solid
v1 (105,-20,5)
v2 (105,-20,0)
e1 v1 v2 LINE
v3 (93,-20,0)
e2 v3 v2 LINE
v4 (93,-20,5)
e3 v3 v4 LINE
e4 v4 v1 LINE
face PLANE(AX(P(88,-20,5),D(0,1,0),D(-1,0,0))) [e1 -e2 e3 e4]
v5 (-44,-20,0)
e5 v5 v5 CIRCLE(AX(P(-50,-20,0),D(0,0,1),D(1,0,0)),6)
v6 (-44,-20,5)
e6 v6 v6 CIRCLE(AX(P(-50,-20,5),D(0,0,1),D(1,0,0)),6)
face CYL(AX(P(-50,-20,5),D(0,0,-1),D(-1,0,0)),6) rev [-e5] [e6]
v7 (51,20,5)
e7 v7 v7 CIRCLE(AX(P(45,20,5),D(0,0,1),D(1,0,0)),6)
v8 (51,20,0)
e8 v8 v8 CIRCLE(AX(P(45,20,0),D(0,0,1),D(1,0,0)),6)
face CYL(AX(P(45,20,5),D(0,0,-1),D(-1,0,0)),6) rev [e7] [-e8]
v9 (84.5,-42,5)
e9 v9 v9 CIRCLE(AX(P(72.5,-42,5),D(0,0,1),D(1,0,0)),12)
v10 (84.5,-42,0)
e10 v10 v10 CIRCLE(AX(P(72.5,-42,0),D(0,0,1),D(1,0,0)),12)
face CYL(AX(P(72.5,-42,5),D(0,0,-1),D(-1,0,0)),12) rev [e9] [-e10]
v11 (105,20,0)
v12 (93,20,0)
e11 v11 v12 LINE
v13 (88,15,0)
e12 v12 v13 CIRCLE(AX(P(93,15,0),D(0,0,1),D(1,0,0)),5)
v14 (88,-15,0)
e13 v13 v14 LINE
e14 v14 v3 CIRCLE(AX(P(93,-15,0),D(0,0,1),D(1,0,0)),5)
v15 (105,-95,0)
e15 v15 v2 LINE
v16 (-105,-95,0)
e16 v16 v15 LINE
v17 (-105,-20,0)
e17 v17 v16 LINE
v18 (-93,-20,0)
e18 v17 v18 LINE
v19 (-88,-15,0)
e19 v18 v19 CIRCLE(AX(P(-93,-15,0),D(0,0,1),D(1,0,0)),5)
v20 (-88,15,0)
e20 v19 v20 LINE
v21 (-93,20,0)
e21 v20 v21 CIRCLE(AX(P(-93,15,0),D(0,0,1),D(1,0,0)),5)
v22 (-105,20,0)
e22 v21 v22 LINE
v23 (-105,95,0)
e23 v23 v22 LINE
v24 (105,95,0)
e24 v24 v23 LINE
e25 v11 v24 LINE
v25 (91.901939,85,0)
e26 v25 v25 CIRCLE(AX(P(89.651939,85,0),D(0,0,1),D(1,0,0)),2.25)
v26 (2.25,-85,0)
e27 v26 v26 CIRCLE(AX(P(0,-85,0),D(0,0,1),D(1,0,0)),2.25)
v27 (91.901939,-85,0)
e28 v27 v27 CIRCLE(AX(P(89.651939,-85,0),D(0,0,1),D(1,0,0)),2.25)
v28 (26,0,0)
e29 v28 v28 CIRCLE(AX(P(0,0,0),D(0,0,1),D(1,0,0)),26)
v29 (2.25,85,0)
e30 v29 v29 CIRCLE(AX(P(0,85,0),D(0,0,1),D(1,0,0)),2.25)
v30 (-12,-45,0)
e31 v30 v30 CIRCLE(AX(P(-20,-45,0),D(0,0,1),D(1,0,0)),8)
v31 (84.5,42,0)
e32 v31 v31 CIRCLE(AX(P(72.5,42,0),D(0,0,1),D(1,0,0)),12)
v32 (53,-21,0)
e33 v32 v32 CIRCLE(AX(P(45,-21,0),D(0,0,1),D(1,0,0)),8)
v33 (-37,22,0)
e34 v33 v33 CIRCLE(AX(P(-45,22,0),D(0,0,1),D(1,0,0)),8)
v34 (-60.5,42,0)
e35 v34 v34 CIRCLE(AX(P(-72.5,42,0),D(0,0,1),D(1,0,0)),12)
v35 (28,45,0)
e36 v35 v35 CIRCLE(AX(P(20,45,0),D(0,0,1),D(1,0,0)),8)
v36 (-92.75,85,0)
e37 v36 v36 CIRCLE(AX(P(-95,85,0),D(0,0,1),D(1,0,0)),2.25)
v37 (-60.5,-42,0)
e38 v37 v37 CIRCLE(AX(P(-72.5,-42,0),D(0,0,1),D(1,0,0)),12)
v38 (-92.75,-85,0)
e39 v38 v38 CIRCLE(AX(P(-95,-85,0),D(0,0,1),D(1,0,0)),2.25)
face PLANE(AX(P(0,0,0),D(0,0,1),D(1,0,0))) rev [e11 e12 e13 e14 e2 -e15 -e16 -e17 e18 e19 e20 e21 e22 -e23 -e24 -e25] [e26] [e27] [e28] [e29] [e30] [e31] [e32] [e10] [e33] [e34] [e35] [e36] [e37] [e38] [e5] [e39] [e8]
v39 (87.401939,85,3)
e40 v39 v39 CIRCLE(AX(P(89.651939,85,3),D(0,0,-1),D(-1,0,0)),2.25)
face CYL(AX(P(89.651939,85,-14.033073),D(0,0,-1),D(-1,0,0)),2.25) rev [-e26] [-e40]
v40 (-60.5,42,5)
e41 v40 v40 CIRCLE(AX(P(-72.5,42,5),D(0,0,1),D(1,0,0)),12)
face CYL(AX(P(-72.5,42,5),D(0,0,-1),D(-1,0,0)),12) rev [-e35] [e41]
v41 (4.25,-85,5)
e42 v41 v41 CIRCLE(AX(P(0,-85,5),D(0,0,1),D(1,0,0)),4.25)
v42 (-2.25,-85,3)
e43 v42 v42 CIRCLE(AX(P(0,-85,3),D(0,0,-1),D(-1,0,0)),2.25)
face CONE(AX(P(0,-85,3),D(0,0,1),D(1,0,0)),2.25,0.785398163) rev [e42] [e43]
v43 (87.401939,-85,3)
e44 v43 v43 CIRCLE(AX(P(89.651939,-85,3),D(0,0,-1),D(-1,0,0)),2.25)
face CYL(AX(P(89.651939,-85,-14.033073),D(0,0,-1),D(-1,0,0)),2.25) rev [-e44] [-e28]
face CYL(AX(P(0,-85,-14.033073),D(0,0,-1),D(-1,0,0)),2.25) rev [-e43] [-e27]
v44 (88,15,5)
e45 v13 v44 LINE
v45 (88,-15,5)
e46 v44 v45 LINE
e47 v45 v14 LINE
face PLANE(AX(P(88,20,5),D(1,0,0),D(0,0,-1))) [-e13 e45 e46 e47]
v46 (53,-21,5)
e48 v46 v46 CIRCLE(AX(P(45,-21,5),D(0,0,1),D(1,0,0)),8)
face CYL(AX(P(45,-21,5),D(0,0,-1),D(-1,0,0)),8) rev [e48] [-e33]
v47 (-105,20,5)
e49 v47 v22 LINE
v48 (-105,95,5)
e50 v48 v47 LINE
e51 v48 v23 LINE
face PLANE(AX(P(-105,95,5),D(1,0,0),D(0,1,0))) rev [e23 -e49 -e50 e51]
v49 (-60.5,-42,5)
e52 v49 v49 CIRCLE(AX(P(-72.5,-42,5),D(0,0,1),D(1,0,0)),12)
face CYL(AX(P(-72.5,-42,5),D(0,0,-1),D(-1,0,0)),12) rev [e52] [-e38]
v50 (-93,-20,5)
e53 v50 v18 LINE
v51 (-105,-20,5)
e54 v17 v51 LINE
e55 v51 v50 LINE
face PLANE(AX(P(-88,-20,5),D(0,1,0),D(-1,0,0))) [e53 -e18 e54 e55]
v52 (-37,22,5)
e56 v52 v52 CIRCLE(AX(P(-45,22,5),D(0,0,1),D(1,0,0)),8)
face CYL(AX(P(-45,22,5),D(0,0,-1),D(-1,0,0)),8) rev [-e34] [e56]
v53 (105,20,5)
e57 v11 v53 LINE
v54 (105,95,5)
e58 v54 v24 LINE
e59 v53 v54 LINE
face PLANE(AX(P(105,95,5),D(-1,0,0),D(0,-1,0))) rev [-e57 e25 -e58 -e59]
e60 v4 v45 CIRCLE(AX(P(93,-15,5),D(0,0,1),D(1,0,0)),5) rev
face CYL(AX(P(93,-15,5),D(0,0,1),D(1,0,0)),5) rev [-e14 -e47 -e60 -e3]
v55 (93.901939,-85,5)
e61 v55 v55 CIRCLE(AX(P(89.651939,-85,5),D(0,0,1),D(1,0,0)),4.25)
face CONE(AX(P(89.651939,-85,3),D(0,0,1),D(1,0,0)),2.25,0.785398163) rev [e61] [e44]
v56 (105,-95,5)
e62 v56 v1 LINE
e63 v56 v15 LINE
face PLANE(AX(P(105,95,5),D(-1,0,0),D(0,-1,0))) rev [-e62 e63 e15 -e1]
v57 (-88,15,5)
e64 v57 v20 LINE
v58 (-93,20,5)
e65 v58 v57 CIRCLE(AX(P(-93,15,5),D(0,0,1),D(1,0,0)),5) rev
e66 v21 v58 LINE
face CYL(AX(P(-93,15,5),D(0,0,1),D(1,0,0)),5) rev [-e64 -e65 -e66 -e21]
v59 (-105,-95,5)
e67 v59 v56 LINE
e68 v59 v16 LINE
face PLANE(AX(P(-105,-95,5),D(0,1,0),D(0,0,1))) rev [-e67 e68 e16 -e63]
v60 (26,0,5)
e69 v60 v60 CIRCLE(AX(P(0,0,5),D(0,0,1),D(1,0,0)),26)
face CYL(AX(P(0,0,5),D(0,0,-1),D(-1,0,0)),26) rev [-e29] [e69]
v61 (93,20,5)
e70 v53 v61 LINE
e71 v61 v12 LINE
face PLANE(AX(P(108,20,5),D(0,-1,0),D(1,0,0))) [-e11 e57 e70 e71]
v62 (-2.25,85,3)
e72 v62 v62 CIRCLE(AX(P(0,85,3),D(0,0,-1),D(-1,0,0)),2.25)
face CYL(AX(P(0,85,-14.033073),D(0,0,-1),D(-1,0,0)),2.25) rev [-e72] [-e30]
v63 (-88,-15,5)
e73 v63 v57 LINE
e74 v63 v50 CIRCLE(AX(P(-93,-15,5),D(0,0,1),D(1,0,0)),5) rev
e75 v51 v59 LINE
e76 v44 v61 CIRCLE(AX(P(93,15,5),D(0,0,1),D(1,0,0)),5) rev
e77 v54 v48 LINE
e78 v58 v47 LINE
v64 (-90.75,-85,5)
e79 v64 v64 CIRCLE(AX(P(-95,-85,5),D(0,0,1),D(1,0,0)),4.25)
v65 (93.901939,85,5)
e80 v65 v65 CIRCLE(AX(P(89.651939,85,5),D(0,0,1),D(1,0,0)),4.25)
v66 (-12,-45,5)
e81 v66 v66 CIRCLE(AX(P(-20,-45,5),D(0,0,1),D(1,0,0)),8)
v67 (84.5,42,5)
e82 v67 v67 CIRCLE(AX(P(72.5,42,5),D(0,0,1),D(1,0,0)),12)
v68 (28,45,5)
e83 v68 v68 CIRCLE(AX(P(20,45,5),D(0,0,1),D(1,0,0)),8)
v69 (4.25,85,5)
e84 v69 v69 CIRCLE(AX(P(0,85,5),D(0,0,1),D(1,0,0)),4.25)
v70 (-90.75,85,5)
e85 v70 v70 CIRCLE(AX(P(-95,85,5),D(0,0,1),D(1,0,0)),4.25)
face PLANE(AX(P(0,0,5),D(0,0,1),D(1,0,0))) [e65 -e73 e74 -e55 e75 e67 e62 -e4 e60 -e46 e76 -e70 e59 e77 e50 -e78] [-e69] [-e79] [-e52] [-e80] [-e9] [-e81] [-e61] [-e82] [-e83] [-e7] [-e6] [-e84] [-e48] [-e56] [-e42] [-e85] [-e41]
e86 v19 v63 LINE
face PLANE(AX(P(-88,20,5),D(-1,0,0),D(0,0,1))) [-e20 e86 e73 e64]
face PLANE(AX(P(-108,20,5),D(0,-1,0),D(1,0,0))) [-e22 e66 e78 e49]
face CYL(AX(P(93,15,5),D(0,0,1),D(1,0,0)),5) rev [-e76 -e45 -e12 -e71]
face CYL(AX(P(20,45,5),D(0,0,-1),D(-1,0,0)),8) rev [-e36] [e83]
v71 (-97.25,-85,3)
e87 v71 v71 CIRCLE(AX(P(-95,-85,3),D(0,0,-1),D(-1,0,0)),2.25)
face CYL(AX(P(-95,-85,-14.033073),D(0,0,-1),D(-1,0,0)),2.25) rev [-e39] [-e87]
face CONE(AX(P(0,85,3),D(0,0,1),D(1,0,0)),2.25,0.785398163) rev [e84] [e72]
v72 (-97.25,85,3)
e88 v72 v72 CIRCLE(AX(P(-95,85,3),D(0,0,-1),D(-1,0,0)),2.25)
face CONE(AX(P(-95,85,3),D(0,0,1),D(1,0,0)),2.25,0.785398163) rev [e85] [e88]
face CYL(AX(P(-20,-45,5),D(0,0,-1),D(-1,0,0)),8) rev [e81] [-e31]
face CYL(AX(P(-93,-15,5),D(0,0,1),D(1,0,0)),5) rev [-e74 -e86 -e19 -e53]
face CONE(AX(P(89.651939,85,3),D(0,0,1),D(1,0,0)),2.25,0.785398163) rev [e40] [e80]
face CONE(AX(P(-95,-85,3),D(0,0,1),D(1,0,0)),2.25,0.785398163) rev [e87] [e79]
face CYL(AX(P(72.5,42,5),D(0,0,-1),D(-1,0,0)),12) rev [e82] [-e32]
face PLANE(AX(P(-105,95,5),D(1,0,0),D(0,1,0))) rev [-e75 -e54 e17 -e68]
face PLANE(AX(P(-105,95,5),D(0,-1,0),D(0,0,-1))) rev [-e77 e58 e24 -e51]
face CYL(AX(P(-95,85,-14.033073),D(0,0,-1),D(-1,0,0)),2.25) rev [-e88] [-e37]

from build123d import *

# Parameters (mm, degrees)
SKETCH_1_W          = 210
SKETCH_1_H          = 190
EXTRUDE_1_DEPTH     = 5
SKETCH_2_R          = 26
SKETCH_2_R_2        = 8
SKETCH_2_R_3        = 12
SKETCH_2_R_4        = 6
CUT_EXTRUDE_1_DEPTH = 142.686273153
SKETCH_5_W          = 20
SKETCH_5_H          = 40
CUT_EXTRUDE_2_DEPTH = 142.686273153
FILLET_1_R          = 5


# Read off the part's stored shape, not the designer's step: ｽｹｯﾁ-ﾊﾟﾀｰﾝ1
with BuildPart() as part:
    # ｽｹｯﾁ1 → ﾎﾞｽ - 押し出し1 (new body)
    with BuildSketch(Plane.XY):
        Rectangle(SKETCH_1_W, SKETCH_1_H)
    extrude(amount=EXTRUDE_1_DEPTH)

    # ｽｹｯﾁ2 → ｶｯﾄ - 押し出し1 (cut, through all)
    with BuildSketch(Plane.XY):
        Circle(SKETCH_2_R)
        with Locations((20, 45)):
            Circle(SKETCH_2_R_2)
        with Locations((-45, 22)):
            Circle(SKETCH_2_R_2)
        with Locations((-20, -45)):
            Circle(SKETCH_2_R_2)
        with Locations((45, -21)):
            Circle(SKETCH_2_R_2)
        with Locations((-72.5, 42)):
            Circle(SKETCH_2_R_3)
        with Locations((-72.5, -42)):
            Circle(SKETCH_2_R_3)
        with Locations((72.5, -42)):
            Circle(SKETCH_2_R_3)
        with Locations((72.5, 42)):
            Circle(SKETCH_2_R_3)
        with Locations((-50, -20)):
            Circle(SKETCH_2_R_4)
        with Locations((45, 20)):
            Circle(SKETCH_2_R_4)
    extrude(amount=CUT_EXTRUDE_1_DEPTH, mode=Mode.SUBTRACT)


with BuildPart() as body_2:
    # ｽｹｯﾁ3 → 回転1 (revolve)
    with BuildSketch(Plane(origin=(0, 0, 0), x_dir=(0, 0, -1), z_dir=(1, 0, 0)), mode=Mode.PRIVATE) as revolve_1_sk:
        Polygon((3, 85), (3, 87.25), (-3, 87.25), (-10, 94.25), (-10, 85), align=None)
    revolve(revolve_1_sk.sketch.rotate(Axis((0, 85, -14.033072833), (0, 0, 1)), 90), axis=Axis((0, 85, -14.033072833), (0, 0, 1)))


with BuildPart() as body_3:
    # ｽｹｯﾁ-ﾊﾟﾀｰﾝ1 outline → ｽｹｯﾁ-ﾊﾟﾀｰﾝ1 (revolve)
    with BuildSketch(Plane(origin=(89.651938965, -85, 0), x_dir=(1, 0, 0), z_dir=(0, -1, 0))):
        Polygon((0, 10), (0, -3), (2.25, -3), (2.25, 3), (9.25, 10), align=None)
    revolve(axis=Axis((89.651938965, -85, 0), (0, 0, 1)))


with BuildPart() as body_4:
    # Pattern Sketch 1 2 outline → Pattern Sketch 1 2 (revolve)
    with BuildSketch(Plane(origin=(89.651938965, 85, 0), x_dir=(1, 0, 0), z_dir=(0, -1, 0))):
        Polygon((0, 10), (0, -3), (2.25, -3), (2.25, 3), (9.25, 10), align=None)
    revolve(axis=Axis((89.651938965, 85, 0), (0, 0, 1)))


with BuildPart() as body_5:
    # Pattern Sketch 1 3 outline → Pattern Sketch 1 3 (revolve)
    with BuildSketch(Plane.XZ.offset(85)):
        Polygon((0, 10), (0, -3), (2.25, -3), (2.25, 3), (9.25, 10), align=None)
    revolve(axis=Axis((0, -85, 0), (0, 0, 1)))


with BuildPart() as body_6:
    # Pattern Sketch 1 4 outline → Pattern Sketch 1 4 (revolve)
    with BuildSketch(Plane(origin=(-95, -85, 0), x_dir=(1, 0, 0), z_dir=(0, -1, 0))):
        Polygon((0, 10), (0, -3), (2.25, -3), (2.25, 3), (9.25, 10), align=None)
    revolve(axis=Axis((-95, -85, 0), (0, 0, 1)))


with BuildPart() as body_7:
    # Pattern Sketch 1 5 outline → Pattern Sketch 1 5 (revolve)
    with BuildSketch(Plane(origin=(-95, 85, 0), x_dir=(1, 0, 0), z_dir=(0, -1, 0))):
        Polygon((0, 10), (0, -3), (2.25, -3), (2.25, 3), (9.25, 10), align=None)
    revolve(axis=Axis((-95, 85, 0), (0, 0, 1)))


with BuildPart() as part_1:
    add(part.part)

    # Combine 1: cut body 7, body 6, body 5, body 2, body 4, body 3
    add(body_7.part, mode=Mode.SUBTRACT)
    add(body_6.part, mode=Mode.SUBTRACT)
    add(body_5.part, mode=Mode.SUBTRACT)
    add(body_2.part, mode=Mode.SUBTRACT)
    add(body_4.part, mode=Mode.SUBTRACT)
    add(body_3.part, mode=Mode.SUBTRACT)

    # ｽｹｯﾁ5 → ｶｯﾄ - 押し出し2 (cut, through all)
    with BuildSketch(Plane.XY):
        with Locations((-98, 0)):
            Rectangle(SKETCH_5_W, SKETCH_5_H)
        with Locations((98, 0)):
            Rectangle(SKETCH_5_W, SKETCH_5_H)
    extrude(amount=CUT_EXTRUDE_2_DEPTH, mode=Mode.SUBTRACT)

    # ﾌｨﾚｯﾄ1
    fillet_1_edges = [part_1.edges().sort_by_distance(p)[0] for p in [
        (88, -20, 2.5),
        (88, 20, 2.5),
        (-88, 20, 2.5),
        (-88, -20, 2.5),
    ]]
    fillet(fillet_1_edges, radius=FILLET_1_R)


solid = part_1.part
